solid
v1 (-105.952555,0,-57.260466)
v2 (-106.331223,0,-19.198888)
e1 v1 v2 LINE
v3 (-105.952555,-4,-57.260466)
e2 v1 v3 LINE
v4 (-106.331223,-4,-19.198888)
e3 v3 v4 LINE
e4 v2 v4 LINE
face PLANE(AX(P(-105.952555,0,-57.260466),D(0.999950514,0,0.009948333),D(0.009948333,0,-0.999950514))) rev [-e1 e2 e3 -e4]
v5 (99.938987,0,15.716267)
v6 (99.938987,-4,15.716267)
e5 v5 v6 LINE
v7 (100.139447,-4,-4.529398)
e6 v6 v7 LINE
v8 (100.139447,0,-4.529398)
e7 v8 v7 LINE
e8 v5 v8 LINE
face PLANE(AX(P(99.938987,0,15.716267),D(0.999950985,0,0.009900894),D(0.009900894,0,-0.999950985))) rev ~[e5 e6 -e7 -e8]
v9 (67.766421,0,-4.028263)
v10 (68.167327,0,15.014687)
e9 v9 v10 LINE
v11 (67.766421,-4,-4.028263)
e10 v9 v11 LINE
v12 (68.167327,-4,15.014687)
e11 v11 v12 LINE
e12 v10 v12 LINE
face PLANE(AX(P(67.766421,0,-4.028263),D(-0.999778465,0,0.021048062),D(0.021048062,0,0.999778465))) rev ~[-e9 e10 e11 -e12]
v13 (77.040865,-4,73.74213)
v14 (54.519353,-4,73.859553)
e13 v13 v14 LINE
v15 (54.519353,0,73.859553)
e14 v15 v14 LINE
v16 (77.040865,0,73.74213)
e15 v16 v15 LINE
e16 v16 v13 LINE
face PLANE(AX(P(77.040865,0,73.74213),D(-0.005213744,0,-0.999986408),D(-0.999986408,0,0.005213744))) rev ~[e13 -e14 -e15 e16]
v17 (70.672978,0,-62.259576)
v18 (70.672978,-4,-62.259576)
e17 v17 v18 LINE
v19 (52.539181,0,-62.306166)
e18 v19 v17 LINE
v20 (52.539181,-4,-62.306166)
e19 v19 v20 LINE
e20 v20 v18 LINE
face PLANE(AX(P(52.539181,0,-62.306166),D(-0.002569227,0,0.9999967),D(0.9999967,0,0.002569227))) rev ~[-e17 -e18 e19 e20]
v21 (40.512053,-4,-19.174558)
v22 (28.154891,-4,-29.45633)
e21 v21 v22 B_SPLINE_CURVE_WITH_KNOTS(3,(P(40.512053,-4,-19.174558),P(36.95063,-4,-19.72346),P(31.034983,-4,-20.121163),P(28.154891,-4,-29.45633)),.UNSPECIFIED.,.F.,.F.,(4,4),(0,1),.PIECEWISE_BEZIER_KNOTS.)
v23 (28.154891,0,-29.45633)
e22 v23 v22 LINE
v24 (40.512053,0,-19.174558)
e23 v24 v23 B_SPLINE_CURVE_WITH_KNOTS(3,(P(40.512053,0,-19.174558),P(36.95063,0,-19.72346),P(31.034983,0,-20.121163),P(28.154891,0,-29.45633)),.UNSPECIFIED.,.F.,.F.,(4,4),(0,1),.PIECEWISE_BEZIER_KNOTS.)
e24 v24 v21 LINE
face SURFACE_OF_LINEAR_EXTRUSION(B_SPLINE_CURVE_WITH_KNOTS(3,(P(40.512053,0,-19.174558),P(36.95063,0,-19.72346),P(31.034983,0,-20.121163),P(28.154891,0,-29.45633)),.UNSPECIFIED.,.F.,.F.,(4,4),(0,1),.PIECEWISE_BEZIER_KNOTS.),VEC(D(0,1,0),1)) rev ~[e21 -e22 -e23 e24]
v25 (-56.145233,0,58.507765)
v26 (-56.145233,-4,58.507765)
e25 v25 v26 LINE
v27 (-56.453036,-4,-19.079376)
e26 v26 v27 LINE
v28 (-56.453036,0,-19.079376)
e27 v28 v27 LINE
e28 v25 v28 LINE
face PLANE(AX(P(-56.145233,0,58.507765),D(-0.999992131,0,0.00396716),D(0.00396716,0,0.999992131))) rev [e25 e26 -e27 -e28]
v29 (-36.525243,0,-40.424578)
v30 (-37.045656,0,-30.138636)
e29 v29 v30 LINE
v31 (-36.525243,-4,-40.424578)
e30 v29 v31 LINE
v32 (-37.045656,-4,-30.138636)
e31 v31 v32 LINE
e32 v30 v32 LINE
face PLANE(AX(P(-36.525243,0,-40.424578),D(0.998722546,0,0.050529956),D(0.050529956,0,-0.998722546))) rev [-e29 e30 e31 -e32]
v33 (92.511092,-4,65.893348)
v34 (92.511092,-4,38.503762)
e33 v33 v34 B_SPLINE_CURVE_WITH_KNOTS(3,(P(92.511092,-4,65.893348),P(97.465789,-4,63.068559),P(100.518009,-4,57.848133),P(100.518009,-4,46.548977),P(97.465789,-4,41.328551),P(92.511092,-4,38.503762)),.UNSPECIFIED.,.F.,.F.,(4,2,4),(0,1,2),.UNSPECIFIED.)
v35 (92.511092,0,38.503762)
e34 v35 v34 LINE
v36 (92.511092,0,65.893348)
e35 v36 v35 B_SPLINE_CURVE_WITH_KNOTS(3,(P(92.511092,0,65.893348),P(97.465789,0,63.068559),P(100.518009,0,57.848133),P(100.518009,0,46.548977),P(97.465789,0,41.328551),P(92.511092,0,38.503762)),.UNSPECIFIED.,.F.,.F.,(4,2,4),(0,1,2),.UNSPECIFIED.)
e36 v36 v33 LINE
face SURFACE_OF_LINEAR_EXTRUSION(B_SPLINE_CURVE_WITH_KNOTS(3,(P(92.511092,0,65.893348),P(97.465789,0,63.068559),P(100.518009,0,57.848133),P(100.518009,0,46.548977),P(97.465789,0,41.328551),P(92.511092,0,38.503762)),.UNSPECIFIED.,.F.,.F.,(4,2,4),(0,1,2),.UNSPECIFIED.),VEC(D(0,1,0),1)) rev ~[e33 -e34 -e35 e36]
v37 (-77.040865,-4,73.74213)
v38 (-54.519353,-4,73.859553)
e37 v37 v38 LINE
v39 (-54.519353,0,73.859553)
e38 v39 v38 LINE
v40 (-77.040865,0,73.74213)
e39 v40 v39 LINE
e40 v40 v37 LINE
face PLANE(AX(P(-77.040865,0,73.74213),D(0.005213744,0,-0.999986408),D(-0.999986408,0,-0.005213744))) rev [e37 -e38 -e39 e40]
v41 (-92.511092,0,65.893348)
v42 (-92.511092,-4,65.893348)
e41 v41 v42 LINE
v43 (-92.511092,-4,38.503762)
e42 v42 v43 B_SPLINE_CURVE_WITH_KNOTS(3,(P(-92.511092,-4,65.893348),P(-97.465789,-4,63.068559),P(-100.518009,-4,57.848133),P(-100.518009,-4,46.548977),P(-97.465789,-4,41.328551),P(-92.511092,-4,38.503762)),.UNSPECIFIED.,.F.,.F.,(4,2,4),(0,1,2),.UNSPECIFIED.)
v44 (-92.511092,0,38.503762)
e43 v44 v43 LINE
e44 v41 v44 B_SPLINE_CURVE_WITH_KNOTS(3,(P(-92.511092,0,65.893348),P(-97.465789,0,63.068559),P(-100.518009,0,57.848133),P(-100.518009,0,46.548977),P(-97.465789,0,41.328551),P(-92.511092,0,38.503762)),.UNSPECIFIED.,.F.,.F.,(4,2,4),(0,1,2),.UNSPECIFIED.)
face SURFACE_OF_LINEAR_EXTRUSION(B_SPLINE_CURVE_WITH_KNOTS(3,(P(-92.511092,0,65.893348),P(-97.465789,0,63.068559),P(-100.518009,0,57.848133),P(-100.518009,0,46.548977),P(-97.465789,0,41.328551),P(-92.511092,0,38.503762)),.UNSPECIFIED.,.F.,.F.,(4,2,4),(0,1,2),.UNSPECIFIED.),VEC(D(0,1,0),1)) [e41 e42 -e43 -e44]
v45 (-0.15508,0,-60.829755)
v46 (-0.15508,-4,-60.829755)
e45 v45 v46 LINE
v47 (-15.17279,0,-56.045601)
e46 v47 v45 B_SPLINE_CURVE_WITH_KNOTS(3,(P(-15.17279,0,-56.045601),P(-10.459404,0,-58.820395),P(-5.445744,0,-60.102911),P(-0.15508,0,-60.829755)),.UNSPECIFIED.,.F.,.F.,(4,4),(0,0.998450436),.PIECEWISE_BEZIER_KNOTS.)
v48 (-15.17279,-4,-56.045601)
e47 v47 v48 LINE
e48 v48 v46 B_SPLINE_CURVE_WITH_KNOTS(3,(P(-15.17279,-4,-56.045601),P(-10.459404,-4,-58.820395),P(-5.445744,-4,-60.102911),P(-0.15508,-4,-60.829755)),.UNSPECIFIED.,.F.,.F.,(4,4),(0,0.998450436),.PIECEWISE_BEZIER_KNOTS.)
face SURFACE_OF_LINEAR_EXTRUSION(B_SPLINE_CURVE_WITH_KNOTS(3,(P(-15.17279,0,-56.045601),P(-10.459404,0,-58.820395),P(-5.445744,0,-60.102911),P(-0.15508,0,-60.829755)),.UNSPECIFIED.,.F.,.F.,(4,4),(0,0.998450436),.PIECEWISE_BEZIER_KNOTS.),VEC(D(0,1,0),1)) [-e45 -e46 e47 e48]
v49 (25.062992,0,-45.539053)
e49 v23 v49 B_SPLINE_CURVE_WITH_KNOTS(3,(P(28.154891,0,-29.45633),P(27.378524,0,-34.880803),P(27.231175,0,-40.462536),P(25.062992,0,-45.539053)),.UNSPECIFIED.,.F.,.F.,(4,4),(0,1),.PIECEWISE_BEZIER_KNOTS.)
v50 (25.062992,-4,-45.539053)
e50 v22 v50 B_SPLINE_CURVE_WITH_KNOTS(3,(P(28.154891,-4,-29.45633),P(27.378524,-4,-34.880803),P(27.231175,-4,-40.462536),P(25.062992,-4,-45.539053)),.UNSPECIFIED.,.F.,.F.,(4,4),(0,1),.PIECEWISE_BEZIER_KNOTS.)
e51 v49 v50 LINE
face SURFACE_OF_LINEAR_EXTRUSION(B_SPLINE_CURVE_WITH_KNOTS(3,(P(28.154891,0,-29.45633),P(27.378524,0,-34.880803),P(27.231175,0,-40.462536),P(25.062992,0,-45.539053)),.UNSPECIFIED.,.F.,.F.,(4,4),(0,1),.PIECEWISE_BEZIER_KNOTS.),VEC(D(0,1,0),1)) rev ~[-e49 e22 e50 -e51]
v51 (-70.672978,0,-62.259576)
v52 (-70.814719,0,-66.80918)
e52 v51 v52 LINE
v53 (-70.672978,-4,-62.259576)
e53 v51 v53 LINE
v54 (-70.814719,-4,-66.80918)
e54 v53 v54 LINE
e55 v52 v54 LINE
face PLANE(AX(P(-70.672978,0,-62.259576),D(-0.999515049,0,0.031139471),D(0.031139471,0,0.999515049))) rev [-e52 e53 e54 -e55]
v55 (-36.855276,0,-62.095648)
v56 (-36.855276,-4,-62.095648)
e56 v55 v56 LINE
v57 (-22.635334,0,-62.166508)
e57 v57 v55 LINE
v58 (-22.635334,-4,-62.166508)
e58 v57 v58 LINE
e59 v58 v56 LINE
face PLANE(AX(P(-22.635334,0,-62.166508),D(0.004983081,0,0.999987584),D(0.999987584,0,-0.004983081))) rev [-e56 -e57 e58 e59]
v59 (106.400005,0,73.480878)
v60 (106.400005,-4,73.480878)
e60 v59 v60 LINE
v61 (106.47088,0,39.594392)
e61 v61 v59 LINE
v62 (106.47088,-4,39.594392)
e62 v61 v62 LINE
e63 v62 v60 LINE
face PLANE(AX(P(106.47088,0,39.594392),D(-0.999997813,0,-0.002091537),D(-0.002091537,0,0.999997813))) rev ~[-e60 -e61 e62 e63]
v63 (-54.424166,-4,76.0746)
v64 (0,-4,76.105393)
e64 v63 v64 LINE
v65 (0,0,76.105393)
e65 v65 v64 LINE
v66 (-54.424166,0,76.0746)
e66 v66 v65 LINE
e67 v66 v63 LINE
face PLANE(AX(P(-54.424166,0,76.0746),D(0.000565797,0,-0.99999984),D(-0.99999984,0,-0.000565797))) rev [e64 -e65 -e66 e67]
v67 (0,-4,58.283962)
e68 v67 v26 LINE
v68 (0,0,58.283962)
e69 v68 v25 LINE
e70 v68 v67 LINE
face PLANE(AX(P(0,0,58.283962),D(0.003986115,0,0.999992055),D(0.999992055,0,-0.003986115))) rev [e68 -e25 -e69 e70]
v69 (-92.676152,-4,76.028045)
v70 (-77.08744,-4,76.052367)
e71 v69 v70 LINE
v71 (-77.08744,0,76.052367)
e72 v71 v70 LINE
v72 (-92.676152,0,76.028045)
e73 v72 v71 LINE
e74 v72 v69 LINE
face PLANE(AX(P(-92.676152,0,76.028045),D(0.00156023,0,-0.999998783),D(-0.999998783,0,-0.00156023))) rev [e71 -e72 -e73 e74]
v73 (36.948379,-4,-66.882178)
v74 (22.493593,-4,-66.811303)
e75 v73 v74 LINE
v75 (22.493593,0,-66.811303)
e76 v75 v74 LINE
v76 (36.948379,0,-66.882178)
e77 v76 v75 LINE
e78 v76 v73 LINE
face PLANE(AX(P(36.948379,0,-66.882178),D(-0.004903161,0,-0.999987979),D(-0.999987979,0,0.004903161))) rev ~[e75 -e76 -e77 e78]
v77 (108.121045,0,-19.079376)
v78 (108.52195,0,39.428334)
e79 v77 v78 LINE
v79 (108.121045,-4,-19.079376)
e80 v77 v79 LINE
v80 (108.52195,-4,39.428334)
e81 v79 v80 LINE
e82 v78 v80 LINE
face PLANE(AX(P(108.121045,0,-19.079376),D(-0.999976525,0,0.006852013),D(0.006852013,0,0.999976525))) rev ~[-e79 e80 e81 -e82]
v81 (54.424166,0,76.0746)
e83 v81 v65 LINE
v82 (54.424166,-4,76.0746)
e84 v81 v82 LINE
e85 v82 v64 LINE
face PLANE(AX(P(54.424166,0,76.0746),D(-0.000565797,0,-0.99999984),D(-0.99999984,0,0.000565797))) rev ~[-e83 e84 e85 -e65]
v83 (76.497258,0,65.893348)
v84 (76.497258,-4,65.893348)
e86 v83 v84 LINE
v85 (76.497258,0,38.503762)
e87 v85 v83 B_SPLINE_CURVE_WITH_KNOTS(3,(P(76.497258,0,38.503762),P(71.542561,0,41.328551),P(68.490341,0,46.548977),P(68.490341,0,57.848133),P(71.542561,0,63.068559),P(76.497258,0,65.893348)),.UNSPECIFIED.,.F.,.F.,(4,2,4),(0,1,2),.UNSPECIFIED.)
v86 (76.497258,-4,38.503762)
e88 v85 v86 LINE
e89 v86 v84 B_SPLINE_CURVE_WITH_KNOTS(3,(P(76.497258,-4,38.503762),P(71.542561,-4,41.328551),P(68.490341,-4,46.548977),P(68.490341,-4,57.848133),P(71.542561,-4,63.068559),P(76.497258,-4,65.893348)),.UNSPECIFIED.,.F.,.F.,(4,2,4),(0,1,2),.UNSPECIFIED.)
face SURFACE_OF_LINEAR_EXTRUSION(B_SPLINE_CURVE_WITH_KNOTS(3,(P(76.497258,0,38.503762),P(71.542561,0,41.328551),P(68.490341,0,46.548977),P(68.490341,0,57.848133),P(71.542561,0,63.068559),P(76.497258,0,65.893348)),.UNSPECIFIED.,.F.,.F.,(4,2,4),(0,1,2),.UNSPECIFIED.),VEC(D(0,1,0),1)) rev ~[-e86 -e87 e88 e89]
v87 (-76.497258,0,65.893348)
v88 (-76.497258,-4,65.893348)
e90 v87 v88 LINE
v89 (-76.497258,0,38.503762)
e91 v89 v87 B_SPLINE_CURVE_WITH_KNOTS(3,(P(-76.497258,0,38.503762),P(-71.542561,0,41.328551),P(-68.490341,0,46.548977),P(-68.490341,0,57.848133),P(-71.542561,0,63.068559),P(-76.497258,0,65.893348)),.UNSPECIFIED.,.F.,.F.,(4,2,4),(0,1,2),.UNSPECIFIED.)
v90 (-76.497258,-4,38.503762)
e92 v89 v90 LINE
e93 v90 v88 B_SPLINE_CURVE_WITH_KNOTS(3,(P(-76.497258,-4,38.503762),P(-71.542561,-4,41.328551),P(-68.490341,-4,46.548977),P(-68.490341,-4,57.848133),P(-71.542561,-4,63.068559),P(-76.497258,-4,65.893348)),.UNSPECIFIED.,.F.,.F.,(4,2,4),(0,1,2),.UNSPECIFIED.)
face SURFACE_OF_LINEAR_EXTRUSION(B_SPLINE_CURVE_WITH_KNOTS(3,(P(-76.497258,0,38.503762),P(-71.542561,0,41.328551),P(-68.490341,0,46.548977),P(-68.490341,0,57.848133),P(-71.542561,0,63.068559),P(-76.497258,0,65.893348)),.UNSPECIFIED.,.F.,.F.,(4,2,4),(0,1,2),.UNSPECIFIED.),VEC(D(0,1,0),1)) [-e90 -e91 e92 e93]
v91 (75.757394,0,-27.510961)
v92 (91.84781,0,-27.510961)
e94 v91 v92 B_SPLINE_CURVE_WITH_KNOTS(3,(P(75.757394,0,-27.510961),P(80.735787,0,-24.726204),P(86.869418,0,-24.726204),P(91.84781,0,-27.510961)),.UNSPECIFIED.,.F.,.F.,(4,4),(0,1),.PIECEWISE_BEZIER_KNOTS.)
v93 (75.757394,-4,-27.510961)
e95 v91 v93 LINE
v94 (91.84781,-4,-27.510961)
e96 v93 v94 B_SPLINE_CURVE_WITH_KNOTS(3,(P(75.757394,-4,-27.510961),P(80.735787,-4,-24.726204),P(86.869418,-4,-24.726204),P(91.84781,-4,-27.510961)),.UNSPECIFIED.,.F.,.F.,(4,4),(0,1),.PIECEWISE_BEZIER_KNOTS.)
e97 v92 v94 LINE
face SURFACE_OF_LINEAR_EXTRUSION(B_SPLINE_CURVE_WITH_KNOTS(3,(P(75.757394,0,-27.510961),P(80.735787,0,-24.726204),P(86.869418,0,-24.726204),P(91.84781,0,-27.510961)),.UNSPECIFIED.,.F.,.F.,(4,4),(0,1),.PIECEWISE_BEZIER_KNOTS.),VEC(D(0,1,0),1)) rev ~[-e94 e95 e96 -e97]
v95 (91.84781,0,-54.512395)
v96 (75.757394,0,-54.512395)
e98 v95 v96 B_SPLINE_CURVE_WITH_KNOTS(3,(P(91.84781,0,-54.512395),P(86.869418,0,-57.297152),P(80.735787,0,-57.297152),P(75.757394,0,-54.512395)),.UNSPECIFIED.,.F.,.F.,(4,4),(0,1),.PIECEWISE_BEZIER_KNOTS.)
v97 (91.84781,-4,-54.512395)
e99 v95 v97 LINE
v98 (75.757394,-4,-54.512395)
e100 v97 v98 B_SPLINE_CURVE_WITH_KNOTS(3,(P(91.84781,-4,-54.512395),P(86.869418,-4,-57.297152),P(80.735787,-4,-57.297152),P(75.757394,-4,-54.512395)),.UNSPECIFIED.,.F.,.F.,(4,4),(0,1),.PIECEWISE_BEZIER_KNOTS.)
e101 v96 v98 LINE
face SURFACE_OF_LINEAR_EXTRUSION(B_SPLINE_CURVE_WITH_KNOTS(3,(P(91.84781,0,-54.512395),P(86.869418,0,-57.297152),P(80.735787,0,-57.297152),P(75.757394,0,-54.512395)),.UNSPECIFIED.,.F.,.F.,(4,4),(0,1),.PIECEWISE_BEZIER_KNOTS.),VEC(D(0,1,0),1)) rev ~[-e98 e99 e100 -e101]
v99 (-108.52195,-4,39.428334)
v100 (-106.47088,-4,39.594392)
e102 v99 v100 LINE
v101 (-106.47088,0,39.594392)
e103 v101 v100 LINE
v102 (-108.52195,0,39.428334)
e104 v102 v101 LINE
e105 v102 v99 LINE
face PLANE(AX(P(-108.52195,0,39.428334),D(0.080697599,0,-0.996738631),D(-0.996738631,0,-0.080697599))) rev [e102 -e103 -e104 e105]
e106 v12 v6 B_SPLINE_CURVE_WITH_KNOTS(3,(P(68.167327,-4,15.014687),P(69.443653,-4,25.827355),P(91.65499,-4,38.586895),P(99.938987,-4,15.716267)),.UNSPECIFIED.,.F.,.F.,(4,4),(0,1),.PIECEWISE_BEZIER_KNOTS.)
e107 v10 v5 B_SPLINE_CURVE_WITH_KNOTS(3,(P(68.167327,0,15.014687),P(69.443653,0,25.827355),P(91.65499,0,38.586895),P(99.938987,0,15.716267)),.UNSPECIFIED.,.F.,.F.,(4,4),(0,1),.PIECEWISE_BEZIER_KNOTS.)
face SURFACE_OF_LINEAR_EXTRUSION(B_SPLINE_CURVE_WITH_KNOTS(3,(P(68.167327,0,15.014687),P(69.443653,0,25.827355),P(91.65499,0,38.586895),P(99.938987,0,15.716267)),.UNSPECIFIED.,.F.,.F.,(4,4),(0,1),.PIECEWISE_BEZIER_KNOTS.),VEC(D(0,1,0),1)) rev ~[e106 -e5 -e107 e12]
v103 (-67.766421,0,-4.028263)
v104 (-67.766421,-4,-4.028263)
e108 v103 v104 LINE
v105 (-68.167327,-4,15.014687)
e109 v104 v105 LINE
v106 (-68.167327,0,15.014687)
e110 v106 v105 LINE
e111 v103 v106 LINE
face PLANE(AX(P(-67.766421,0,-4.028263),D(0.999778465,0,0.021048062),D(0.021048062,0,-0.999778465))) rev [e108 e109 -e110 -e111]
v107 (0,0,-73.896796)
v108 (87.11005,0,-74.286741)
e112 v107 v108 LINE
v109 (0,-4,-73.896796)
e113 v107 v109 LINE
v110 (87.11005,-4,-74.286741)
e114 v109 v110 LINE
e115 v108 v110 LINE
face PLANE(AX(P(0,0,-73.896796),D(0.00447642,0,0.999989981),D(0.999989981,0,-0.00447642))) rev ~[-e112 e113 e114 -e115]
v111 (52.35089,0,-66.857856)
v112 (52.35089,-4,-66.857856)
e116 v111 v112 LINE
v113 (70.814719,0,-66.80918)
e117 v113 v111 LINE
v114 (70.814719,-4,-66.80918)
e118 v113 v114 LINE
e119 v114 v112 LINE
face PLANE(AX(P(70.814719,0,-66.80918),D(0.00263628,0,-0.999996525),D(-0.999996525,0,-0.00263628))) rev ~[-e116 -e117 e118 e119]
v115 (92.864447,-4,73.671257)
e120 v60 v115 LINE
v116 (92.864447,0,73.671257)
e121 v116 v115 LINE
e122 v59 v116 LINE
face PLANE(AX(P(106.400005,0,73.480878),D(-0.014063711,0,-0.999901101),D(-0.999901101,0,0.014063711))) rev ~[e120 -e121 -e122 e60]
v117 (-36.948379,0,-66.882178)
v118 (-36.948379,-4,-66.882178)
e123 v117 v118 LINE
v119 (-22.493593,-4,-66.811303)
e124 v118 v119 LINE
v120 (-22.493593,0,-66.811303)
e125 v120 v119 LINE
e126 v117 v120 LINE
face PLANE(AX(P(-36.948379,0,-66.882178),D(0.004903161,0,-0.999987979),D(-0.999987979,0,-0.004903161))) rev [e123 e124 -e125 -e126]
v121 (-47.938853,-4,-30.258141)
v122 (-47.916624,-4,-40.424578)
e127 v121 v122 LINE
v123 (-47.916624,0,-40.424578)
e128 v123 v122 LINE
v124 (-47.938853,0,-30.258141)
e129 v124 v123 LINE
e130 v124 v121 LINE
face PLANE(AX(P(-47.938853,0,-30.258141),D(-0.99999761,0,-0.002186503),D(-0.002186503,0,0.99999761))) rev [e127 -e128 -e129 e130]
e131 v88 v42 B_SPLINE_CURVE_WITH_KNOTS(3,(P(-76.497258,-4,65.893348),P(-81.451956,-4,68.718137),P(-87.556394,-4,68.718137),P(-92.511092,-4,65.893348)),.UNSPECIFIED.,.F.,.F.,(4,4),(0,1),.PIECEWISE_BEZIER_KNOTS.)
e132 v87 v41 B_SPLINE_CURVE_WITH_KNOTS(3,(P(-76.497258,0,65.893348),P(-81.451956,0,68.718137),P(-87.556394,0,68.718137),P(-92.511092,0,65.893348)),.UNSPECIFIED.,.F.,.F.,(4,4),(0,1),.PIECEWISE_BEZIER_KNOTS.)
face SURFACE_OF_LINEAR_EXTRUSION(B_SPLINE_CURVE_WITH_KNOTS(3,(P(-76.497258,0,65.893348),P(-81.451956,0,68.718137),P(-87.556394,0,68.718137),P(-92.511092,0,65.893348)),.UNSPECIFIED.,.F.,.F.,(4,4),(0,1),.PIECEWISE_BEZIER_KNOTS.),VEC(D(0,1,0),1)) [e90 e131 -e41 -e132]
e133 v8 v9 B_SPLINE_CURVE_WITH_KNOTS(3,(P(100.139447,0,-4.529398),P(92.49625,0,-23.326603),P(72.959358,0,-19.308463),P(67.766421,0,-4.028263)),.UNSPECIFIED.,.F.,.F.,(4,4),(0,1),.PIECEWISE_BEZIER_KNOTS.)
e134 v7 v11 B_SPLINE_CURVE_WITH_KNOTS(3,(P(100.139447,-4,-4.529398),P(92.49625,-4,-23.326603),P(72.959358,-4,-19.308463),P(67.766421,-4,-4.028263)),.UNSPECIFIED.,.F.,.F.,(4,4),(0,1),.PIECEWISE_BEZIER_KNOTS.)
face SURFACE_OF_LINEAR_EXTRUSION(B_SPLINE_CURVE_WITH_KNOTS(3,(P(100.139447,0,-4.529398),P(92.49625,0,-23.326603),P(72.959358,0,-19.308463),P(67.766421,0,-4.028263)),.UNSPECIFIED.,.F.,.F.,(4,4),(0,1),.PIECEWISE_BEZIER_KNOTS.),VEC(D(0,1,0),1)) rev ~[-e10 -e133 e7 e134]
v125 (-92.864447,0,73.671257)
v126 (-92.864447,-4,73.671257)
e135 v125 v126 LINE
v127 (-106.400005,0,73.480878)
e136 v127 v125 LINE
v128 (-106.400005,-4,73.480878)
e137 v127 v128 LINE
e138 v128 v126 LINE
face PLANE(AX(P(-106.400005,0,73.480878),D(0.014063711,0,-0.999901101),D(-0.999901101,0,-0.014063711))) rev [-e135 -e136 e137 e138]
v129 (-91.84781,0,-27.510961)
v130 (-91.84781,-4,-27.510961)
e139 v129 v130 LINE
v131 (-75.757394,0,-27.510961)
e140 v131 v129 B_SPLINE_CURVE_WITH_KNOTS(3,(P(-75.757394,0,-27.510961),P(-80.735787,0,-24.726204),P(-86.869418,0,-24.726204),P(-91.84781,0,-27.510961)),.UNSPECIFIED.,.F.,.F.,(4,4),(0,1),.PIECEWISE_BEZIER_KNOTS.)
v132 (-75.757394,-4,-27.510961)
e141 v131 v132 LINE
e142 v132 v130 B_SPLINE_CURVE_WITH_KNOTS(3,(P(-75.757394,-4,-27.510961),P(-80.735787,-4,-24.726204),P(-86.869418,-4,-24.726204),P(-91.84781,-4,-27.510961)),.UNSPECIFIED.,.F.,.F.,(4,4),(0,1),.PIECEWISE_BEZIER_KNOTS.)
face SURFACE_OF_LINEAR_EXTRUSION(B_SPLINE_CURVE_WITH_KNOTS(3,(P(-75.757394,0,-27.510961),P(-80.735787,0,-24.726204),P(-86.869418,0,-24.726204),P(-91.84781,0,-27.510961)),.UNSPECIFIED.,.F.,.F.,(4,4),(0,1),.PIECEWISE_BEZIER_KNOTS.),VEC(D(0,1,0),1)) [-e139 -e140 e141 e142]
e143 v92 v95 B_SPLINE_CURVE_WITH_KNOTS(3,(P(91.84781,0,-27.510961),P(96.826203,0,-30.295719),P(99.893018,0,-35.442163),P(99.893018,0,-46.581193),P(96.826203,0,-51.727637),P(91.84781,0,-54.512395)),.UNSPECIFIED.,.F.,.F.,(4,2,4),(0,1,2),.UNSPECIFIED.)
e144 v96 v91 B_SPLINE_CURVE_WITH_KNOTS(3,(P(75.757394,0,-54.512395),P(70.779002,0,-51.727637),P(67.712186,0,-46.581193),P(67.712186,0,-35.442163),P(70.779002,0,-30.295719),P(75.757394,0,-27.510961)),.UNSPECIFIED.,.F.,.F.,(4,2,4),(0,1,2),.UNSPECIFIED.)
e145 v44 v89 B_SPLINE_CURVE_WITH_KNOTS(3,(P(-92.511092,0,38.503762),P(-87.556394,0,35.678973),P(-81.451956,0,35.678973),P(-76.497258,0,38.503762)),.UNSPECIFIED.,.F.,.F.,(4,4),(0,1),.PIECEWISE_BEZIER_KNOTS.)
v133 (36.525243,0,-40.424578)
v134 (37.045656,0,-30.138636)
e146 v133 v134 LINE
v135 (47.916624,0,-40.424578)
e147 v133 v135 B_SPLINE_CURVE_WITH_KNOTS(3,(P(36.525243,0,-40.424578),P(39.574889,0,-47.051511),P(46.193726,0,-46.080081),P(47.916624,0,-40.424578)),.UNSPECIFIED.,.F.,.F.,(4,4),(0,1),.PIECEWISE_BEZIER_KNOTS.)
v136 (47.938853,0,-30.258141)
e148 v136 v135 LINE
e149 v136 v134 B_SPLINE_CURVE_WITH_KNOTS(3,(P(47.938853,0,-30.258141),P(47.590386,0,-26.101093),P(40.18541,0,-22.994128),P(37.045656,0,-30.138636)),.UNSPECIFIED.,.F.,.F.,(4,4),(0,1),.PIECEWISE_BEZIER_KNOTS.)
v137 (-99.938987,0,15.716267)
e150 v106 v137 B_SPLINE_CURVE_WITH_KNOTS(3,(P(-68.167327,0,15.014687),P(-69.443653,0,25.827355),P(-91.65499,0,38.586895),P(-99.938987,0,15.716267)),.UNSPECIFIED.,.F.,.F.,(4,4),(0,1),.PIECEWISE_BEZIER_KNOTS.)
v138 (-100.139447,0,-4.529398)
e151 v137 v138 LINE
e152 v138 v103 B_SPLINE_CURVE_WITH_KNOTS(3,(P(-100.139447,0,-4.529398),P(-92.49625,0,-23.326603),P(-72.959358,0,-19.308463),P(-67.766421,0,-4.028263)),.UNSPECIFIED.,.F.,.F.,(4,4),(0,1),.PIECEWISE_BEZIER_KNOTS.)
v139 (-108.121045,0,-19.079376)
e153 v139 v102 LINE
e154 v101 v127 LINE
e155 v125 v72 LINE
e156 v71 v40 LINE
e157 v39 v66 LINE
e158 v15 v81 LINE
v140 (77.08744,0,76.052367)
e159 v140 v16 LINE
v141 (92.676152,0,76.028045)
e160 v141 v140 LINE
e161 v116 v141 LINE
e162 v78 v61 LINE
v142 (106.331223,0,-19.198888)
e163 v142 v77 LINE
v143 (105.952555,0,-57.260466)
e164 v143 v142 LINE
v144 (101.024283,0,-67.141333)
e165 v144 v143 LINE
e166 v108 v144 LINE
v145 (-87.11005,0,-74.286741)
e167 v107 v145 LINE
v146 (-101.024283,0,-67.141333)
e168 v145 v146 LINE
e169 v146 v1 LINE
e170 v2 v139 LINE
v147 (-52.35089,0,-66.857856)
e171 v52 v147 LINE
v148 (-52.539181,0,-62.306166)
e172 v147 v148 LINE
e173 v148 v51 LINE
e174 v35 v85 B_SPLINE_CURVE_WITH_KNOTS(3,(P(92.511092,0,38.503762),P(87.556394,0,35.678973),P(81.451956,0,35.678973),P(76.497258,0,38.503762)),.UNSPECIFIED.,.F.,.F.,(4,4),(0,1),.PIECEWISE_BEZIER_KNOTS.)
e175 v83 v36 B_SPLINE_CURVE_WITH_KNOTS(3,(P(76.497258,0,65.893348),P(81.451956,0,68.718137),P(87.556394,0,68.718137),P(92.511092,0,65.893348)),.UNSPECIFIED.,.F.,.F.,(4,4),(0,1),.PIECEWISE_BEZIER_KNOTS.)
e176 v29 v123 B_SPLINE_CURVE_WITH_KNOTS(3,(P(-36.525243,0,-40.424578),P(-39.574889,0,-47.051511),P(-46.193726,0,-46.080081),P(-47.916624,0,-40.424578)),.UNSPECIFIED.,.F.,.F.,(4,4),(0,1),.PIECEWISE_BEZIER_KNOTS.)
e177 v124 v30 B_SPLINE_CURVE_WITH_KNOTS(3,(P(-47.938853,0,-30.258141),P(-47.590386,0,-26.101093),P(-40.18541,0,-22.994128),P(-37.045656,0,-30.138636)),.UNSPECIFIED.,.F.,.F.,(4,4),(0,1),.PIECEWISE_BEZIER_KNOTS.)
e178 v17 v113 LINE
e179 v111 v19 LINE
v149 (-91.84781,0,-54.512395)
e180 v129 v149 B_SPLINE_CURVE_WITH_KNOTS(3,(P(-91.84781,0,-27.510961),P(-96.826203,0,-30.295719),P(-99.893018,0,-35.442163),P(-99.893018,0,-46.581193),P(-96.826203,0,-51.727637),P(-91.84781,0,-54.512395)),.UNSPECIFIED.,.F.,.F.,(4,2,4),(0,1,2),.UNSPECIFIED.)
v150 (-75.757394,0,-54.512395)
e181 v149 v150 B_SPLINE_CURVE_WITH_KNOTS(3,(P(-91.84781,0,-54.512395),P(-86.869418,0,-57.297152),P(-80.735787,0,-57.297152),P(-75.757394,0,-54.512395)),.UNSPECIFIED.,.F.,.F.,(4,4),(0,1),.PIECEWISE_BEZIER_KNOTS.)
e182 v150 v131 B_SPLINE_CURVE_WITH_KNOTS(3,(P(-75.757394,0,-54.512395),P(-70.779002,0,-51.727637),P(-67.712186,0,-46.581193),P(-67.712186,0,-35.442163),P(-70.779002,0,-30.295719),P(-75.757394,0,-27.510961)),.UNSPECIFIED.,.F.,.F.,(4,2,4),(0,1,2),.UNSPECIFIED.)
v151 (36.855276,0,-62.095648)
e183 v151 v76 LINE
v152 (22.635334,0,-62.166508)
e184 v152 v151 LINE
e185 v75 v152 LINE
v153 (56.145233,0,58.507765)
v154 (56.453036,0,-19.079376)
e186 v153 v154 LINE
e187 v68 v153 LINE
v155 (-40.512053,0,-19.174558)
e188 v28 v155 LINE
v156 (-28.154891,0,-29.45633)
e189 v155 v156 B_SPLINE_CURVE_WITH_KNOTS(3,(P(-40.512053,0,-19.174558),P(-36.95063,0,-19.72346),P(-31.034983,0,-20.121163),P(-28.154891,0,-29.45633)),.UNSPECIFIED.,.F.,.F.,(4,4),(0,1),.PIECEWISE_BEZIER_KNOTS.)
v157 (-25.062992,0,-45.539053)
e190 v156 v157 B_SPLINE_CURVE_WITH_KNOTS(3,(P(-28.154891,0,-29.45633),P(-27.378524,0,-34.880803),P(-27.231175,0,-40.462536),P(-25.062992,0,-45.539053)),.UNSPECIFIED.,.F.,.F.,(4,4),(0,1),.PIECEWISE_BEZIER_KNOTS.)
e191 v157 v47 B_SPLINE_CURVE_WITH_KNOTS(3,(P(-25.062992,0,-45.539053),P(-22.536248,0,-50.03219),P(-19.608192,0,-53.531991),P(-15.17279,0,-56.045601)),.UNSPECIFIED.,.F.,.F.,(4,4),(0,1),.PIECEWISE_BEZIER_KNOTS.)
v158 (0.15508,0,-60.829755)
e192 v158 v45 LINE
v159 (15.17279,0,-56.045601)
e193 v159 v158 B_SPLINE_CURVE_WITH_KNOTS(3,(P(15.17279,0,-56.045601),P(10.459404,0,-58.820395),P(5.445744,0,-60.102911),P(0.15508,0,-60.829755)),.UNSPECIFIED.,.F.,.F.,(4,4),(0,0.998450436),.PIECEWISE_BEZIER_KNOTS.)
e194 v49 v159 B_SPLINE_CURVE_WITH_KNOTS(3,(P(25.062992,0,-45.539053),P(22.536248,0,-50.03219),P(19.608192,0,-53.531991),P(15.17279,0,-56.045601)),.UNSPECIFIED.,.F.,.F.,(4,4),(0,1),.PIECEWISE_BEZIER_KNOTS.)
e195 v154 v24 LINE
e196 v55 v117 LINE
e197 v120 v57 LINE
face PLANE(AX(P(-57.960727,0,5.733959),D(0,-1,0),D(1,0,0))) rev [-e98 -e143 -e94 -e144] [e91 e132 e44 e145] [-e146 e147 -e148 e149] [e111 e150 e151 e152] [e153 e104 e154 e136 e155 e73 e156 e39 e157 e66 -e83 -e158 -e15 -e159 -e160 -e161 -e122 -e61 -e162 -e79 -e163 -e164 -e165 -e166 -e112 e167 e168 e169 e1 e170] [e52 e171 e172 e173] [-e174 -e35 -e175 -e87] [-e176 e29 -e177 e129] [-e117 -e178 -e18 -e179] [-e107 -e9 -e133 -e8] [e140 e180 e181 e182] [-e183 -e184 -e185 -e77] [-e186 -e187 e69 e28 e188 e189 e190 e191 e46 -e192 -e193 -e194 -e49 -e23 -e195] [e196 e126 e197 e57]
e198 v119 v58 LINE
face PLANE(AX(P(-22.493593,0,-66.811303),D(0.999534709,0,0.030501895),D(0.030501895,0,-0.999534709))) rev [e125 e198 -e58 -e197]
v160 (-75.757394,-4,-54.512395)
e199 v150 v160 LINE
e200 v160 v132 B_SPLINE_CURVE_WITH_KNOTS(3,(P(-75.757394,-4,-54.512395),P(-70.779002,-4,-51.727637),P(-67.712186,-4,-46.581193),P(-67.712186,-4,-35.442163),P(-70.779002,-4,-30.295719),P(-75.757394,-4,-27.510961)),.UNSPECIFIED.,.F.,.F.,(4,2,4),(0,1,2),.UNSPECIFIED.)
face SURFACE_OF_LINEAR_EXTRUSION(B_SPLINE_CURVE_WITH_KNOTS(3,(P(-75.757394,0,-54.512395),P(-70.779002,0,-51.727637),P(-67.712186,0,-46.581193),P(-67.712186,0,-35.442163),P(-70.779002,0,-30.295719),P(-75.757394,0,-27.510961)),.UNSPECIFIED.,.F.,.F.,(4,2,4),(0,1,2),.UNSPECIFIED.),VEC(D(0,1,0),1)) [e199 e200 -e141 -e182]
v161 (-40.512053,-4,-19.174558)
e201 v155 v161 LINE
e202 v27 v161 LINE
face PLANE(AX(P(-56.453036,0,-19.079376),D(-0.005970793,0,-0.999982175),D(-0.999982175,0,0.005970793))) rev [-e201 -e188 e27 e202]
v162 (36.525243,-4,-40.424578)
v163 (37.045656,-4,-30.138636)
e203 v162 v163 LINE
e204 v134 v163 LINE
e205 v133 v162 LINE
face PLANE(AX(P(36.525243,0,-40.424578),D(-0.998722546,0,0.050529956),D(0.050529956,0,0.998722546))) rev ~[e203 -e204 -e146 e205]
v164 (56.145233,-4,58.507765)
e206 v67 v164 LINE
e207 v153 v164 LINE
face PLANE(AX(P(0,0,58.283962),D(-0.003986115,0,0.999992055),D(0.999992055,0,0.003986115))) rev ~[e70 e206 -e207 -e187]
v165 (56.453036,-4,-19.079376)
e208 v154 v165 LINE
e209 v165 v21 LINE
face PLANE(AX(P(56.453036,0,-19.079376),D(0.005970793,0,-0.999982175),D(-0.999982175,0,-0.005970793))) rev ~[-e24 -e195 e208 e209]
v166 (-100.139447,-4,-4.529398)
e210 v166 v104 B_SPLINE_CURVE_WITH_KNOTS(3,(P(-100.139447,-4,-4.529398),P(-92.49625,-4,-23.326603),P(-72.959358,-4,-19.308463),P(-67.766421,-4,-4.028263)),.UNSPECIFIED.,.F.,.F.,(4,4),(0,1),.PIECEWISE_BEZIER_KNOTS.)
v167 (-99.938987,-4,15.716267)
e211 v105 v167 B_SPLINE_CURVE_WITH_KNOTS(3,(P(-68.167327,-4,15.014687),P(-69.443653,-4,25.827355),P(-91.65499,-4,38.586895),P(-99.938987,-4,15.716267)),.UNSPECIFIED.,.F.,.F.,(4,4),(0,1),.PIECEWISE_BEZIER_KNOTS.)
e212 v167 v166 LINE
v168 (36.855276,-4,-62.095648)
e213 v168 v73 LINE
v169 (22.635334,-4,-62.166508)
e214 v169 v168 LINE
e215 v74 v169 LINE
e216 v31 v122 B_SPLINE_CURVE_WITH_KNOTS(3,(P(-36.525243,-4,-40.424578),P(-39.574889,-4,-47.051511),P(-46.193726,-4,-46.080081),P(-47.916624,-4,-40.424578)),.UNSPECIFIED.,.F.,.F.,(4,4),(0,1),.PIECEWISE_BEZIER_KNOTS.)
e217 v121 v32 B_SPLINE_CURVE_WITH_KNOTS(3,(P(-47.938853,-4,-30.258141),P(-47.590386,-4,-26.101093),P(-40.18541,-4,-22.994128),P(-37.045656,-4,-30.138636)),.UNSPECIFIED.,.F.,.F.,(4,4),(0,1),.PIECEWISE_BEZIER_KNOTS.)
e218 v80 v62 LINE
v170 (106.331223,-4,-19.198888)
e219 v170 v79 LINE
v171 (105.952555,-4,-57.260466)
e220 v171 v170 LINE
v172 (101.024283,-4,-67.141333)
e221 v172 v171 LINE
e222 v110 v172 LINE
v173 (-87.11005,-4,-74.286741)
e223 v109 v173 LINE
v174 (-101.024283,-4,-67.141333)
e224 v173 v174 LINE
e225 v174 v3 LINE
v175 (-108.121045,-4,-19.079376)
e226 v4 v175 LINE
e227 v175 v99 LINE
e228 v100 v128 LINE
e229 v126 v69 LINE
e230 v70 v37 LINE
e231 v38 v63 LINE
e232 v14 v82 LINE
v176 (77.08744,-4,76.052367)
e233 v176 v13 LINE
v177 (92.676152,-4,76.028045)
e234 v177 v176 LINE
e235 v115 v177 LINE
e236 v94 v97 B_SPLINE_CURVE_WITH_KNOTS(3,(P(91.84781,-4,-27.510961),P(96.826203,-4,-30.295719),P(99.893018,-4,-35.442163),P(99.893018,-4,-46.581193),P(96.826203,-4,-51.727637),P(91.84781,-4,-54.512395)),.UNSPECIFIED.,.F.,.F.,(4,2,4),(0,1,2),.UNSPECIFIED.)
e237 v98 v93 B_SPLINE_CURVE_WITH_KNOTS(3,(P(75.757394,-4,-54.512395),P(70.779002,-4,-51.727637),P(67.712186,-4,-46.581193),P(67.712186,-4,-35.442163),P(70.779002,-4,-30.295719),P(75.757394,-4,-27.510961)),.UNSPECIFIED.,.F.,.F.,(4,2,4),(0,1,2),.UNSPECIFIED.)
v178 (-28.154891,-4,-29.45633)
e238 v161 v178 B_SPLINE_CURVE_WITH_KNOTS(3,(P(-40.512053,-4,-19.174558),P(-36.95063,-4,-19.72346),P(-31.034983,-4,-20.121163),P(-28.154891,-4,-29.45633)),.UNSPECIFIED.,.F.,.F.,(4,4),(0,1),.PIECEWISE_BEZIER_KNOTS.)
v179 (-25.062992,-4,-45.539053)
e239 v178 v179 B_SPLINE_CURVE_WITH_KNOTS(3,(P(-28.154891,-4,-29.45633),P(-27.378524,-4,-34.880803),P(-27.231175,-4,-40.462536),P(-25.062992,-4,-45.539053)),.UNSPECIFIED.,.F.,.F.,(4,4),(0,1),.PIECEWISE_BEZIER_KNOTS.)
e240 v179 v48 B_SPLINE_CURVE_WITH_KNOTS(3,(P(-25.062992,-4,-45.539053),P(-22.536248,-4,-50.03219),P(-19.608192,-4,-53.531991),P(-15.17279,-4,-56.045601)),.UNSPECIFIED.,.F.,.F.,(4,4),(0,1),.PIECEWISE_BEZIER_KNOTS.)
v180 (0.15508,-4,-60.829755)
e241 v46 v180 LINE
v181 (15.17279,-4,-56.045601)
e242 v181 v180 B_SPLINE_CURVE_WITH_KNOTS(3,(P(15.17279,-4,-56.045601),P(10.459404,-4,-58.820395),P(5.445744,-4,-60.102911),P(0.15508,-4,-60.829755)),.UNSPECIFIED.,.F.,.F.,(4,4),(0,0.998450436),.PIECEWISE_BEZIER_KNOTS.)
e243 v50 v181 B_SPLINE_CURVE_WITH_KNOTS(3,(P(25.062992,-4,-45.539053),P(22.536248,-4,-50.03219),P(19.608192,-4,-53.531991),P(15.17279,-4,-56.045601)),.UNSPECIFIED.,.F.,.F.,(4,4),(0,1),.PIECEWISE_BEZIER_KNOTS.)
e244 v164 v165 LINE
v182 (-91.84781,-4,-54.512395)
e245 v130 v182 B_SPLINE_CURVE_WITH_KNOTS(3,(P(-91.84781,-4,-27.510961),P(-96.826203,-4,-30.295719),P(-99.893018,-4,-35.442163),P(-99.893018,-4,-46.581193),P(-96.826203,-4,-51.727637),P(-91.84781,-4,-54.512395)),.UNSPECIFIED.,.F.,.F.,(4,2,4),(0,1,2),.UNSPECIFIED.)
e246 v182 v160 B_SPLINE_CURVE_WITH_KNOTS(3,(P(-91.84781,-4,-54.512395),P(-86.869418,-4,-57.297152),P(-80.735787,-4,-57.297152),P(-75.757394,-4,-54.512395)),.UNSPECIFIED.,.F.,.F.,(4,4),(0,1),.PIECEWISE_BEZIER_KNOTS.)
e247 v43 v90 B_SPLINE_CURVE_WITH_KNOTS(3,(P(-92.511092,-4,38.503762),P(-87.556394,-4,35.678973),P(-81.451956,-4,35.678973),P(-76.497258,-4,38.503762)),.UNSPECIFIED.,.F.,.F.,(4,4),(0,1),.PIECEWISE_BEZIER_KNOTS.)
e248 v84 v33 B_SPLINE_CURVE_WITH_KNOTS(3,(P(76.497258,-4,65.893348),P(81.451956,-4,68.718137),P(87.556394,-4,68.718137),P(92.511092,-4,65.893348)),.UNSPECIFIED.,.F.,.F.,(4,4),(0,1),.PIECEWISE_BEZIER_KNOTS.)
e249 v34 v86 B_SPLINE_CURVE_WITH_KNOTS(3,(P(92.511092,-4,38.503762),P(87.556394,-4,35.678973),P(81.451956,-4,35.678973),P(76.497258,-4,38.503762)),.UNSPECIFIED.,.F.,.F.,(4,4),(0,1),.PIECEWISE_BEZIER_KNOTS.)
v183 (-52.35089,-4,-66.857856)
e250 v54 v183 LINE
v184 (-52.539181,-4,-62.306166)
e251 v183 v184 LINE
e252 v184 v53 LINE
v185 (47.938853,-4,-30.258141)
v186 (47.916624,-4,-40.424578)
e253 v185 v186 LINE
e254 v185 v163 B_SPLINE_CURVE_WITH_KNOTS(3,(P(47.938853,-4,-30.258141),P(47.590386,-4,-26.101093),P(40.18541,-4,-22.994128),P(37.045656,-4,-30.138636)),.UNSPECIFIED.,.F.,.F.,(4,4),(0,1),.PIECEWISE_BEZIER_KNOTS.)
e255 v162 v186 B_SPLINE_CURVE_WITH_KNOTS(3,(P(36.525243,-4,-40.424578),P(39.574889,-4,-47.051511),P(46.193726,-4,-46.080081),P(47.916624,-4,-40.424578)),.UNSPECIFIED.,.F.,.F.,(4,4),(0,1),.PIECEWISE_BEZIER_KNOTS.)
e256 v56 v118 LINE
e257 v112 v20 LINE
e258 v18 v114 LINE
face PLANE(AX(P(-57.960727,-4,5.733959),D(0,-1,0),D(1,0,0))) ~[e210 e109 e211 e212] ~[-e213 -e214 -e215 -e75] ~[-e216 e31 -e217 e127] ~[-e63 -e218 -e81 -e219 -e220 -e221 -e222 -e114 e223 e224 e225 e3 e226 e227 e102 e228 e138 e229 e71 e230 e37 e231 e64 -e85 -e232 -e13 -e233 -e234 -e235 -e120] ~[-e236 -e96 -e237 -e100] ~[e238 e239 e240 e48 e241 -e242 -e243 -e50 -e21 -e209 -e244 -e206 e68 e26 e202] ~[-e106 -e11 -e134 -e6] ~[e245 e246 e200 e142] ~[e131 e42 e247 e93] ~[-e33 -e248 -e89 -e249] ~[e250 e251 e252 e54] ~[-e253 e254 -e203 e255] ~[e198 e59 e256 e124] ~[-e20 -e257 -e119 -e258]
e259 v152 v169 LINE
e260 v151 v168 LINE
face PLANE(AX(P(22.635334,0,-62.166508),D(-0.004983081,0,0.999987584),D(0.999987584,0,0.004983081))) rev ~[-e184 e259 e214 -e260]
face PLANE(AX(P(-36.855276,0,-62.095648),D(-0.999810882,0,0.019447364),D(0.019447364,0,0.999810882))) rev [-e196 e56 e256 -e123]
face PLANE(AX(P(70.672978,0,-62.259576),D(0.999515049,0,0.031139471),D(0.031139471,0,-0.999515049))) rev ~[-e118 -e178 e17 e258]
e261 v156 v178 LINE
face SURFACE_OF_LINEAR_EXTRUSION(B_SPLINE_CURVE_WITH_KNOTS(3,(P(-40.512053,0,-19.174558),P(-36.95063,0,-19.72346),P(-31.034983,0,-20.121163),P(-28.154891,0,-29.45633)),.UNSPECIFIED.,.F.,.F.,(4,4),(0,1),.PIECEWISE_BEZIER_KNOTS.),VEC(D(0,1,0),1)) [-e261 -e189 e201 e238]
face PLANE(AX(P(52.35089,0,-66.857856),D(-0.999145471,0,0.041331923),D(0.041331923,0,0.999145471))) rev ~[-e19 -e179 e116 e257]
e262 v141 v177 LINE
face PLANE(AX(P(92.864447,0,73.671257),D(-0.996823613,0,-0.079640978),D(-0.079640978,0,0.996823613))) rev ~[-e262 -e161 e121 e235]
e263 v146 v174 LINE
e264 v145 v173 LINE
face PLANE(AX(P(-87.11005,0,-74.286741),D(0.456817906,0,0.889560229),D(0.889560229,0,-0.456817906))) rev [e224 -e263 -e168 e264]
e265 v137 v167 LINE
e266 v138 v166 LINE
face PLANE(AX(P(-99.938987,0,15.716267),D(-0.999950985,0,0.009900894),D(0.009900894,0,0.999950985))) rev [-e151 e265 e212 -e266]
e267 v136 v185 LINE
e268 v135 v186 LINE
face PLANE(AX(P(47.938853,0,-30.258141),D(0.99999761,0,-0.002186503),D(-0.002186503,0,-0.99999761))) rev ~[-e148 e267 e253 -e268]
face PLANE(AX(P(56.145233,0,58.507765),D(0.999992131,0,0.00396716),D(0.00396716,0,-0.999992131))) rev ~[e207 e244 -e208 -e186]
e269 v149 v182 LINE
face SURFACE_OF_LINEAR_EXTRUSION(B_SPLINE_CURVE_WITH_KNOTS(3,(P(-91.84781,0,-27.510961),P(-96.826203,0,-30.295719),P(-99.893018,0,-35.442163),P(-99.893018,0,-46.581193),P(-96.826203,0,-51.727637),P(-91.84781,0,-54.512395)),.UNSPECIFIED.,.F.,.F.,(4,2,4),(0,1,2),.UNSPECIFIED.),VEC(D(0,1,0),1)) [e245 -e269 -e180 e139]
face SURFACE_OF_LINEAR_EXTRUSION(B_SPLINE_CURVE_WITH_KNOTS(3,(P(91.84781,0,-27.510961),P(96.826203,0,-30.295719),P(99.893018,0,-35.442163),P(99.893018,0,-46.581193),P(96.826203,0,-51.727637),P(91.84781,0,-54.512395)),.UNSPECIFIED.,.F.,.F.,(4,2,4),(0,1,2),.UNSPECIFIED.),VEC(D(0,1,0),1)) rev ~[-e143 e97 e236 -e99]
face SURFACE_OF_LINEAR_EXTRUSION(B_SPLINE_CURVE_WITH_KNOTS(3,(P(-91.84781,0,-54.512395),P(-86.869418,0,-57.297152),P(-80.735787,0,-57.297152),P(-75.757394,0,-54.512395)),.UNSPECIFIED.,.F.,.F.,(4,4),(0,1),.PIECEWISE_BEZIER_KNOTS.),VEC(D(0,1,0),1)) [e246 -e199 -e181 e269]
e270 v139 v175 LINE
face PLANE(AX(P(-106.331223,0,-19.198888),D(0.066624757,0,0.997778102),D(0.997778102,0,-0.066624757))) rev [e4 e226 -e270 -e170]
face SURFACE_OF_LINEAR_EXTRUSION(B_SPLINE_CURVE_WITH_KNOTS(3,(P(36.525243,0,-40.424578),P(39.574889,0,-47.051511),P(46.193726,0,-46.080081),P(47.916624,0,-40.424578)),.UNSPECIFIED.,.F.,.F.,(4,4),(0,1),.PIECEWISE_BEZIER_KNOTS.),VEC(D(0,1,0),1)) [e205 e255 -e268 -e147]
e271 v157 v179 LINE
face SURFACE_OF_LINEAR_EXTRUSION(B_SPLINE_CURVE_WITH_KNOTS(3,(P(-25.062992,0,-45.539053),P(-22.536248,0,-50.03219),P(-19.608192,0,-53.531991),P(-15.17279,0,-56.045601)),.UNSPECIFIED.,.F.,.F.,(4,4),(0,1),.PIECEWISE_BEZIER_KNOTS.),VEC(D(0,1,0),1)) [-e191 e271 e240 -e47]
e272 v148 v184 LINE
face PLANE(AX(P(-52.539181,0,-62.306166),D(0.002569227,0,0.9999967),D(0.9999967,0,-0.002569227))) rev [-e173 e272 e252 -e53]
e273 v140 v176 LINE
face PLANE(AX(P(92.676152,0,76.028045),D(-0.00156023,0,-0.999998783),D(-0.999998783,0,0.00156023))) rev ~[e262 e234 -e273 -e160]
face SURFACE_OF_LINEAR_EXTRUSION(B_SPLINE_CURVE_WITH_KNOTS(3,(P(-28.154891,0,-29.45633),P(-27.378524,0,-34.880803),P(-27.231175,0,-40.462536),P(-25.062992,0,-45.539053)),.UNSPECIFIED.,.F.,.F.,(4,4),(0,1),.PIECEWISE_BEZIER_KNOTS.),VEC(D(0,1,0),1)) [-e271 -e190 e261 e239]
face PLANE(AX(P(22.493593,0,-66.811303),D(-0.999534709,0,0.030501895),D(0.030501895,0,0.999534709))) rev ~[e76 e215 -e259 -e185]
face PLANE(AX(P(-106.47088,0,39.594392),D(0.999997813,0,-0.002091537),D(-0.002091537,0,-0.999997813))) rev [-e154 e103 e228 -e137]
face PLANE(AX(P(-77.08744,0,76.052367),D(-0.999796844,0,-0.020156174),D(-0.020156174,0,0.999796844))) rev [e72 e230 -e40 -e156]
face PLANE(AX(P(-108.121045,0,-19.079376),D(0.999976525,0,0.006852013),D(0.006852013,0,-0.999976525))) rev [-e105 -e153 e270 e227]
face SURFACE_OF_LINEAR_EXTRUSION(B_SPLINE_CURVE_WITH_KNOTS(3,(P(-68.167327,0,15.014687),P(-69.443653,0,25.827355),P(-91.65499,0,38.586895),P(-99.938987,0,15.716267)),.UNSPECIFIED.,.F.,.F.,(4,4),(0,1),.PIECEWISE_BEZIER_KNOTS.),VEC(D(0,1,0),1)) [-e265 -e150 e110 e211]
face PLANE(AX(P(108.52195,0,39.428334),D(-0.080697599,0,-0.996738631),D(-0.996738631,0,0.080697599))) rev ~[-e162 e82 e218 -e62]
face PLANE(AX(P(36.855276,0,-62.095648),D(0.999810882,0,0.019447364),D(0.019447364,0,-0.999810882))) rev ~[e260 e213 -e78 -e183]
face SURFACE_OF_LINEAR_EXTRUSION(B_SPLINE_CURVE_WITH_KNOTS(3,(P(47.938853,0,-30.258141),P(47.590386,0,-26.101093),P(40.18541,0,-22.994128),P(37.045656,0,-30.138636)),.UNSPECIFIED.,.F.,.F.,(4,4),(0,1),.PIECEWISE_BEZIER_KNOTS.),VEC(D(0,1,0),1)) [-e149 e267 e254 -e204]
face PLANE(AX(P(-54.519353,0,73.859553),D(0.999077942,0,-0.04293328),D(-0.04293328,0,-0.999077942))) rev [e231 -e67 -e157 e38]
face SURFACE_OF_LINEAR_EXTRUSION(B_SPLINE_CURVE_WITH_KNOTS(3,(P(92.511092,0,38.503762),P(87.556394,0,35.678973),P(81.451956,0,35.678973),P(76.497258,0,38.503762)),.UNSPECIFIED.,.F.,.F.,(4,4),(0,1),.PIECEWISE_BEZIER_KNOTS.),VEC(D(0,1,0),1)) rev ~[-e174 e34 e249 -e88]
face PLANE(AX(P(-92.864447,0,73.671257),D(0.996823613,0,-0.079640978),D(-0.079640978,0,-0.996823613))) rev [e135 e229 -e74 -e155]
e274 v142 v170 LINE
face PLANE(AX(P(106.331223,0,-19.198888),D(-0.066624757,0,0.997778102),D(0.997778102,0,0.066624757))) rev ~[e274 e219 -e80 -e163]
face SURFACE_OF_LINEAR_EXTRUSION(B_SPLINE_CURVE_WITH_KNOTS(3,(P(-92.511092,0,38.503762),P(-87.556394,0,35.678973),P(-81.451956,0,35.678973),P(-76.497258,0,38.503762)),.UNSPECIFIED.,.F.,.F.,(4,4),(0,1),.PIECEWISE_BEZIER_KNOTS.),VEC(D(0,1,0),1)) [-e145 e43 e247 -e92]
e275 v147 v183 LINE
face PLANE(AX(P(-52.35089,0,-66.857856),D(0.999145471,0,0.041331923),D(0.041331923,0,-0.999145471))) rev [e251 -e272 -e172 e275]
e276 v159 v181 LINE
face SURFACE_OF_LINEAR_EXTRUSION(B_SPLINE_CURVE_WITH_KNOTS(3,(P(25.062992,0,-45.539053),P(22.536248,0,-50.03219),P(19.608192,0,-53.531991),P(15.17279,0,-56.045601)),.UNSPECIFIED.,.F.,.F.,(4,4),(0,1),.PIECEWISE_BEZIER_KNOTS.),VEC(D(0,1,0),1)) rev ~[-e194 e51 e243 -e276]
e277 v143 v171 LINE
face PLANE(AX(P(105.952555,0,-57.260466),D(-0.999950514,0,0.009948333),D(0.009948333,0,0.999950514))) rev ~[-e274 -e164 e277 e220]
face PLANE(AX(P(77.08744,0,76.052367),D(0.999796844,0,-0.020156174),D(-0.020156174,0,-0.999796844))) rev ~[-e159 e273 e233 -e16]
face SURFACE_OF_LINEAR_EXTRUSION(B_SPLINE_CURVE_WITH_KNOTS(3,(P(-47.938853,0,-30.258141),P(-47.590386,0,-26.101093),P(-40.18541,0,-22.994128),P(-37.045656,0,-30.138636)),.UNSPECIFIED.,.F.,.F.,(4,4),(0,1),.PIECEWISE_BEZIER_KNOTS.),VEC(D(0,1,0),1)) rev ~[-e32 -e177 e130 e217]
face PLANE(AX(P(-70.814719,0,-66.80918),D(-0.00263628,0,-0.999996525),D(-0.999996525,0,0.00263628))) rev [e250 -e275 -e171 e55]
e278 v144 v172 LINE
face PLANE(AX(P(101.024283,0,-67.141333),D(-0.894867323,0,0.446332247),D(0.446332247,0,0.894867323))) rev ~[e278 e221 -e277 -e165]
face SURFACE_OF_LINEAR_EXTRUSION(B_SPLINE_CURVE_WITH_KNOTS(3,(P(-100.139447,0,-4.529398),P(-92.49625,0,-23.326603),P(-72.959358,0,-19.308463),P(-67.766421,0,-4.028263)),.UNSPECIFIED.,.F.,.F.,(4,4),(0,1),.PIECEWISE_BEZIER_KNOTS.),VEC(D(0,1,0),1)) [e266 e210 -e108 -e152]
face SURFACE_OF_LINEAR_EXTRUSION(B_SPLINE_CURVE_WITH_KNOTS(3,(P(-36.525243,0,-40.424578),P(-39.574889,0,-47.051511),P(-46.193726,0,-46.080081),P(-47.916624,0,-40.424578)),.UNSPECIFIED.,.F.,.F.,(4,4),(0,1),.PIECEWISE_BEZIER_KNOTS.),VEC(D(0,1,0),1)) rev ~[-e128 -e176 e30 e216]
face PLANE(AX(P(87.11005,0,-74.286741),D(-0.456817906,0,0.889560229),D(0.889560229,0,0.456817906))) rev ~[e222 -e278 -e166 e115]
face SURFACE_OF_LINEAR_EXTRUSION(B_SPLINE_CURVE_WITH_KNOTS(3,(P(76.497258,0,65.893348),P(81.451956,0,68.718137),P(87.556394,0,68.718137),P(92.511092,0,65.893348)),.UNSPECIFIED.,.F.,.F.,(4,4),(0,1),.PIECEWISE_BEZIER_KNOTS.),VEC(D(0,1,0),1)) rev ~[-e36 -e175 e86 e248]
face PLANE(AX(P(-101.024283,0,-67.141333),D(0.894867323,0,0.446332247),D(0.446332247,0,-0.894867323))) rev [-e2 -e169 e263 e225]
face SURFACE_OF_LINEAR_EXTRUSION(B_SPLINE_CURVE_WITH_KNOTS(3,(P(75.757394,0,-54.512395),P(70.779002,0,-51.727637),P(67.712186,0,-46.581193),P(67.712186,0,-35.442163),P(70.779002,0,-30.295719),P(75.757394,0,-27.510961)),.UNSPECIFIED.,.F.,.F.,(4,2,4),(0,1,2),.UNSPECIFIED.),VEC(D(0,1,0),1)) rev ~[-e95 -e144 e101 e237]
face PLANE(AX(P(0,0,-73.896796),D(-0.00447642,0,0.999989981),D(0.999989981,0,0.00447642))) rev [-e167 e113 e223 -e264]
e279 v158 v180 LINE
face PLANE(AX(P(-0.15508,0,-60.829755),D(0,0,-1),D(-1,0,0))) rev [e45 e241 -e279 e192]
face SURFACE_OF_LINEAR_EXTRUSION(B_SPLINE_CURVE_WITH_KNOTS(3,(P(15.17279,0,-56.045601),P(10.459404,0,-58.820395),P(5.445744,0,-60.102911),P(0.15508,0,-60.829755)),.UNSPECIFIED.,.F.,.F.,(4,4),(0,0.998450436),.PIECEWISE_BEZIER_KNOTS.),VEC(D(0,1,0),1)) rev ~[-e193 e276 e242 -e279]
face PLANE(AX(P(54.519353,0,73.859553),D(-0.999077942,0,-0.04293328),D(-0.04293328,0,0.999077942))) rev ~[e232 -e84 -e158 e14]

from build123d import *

# Parameters (mm, degrees)
F1_DEPTH = 4


# Not quite as in the source:
# - ends of sketch curves that miss each other by under 0.0002 mm in the source are joined


with BuildPart() as f1:
    # F0 (on Front) → F1 (new body)
    with BuildSketch(Plane.XZ):
        with BuildLine():
            Line((0, -60.8297549188), (0, -73.8967955112))
            Line((0, -73.8967955112), (87.1100496289, -74.2867405805))
            Line((87.1100496289, -74.2867405805), (101.0242826289, -67.1413325805))
            Line((101.0242826289, -67.1413325805), (105.9525546289, -57.2604655805))
            Line((105.9525546289, -57.2604655805), (106.3312226289, -19.1988875805))
            Line((106.3312226289, -19.1988875805), (108.1210446289, -19.0793755805))
            Line((108.1210446289, -19.0793755805), (108.5219496289, 39.4283344195))
            Line((108.5219496289, 39.4283344195), (106.4708796289, 39.5943924195))
            Line((106.4708796289, 39.5943924195), (106.4000046289, 73.4808784195))
            Line((106.4000046289, 73.4808784195), (92.8644466289, 73.6712574195))
            Line((92.8644466289, 73.6712574195), (92.6761516289, 76.0280454195))
            Line((92.6761516289, 76.0280454195), (77.0874396289, 76.0523674195))
            Line((77.0874396289, 76.0523674195), (77.0408646289, 73.7421304195))
            Line((77.0408646289, 73.7421304195), (54.5193526289, 73.8595534195))
            Line((54.5193526289, 73.8595534195), (54.4241656289, 76.0746004195))
            Line((54.4241656289, 76.0746004195), (0, 76.1053934693))
            Line((0, 76.1053934693), (0, 58.2839623094))
            Line((0, 58.2839623094), (56.1452326289, 58.5077654195))
            Line((56.1452326289, 58.5077654195), (56.4530356289, -19.0793755805))
            Line((56.4530356289, -19.0793755805), (40.5120526289, -19.1745575805))
            add(Edge.make_bspline(
                [(40.5120526289, -19.1745575805), (36.9506296289, -19.7234595805), (31.0349826289, -20.1211625805), (28.1548906289, -29.4563295805)],
                knots=[0, 0, 0, 0, 1, 1, 1, 1], degree=3))
            add(Edge.make_bspline(
                [(28.1548906289, -29.4563295805), (27.3785236289, -34.8808025805), (27.2311746289, -40.4625355805), (25.0629916289, -45.5390525805)],
                knots=[0, 0, 0, 0, 1, 1, 1, 1], degree=3))
            add(Edge.make_bspline(
                [(25.0629916289, -45.5390525805), (22.5362476289, -50.0321895805), (19.6081916289, -53.5319905805), (15.1727896289, -56.0456005805)],
                knots=[0, 0, 0, 0, 1, 1, 1, 1], degree=3))
            add(Edge.make_bspline(
                [(15.1727896289, -56.0456005805), (10.4594036477, -58.820394717), (5.445743624, -60.1029114405), (0.1550796733, -60.8297549188)],
                knots=[0, 0, 0, 0, 0.9984504356, 0.9984504356, 0.9984504356, 0.9984504356], degree=3))
            Line((0.1550796733, -60.8297549188), (0, -60.8297549188))
        make_face()
        Polygon((22.4935926289, -66.8113025805), (22.6353336289, -62.1665075805), (36.8552756289, -62.0956475805), (36.9483786289, -66.8821775805), align=None, mode=Mode.SUBTRACT)
        with BuildLine():
            Line((36.5252426289, -40.4245775805), (37.0456556289, -30.1386355805))
            add(Edge.make_bspline(
                [(47.9388526289, -30.2581405805), (47.5903856289, -26.1010925805), (40.1854096289, -22.9941275805), (37.0456556289, -30.1386355805)],
                knots=[0, 0, 0, 0, 1, 1, 1, 1], degree=3))
            Line((47.9388526289, -30.2581405805), (47.9166236289, -40.4245775805))
            add(Edge.make_bspline(
                [(36.5252426289, -40.4245775805), (39.5748886289, -47.0515105805), (46.1937256289, -46.0800805805), (47.9166236289, -40.4245775805)],
                knots=[0, 0, 0, 0, 1, 1, 1, 1], degree=3))
        make_face(mode=Mode.SUBTRACT)
        Polygon((52.3508896289, -66.8578555805), (52.5391806289, -62.3061655805), (70.6729776289, -62.2595755805), (70.8147186289, -66.8091795805), align=None, mode=Mode.SUBTRACT)
        with BuildLine():
            add(Edge.make_bspline(
                [(91.8478096289, -27.5109605805), (96.8262026289, -30.2957185805), (99.8930176289, -35.4421625805), (99.8930176289, -41.0116775805)],
                knots=[0, 0, 0, 0, 1, 1, 1, 1], degree=3))
            add(Edge.make_bspline(
                [(99.8930176289, -41.0116775805), (99.8930176289, -46.5811925805), (96.8262026289, -51.7276365805), (91.8478096289, -54.5123945805)],
                knots=[0, 0, 0, 0, 1, 1, 1, 1], degree=3))
            add(Edge.make_bspline(
                [(91.8478096289, -54.5123945805), (86.8694176289, -57.2971515805), (80.7357866289, -57.2971515805), (75.7573936289, -54.5123945805)],
                knots=[0, 0, 0, 0, 1, 1, 1, 1], degree=3))
            add(Edge.make_bspline(
                [(75.7573936289, -54.5123945805), (70.7790016289, -51.7276365805), (67.7121856289, -46.5811925805), (67.7121856289, -41.0116775805)],
                knots=[0, 0, 0, 0, 1, 1, 1, 1], degree=3))
            add(Edge.make_bspline(
                [(67.7121856289, -41.0116775805), (67.7121856289, -35.4421625805), (70.7790016289, -30.2957185805), (75.7573936289, -27.5109605805)],
                knots=[0, 0, 0, 0, 1, 1, 1, 1], degree=3))
            add(Edge.make_bspline(
                [(75.7573936289, -27.5109605805), (80.7357866289, -24.7262035805), (86.8694176289, -24.7262035805), (91.8478096289, -27.5109605805)],
                knots=[0, 0, 0, 0, 1, 1, 1, 1], degree=3))
        make_face(mode=Mode.SUBTRACT)
        with BuildLine():
            add(Edge.make_bspline(
                [(68.1673266289, 15.0146874195), (69.4436526289, 25.8273554195), (91.6549896289, 38.5868954195), (99.9389866289, 15.7162674195)],
                knots=[0, 0, 0, 0, 1, 1, 1, 1], degree=3))
            Line((99.9389866289, 15.7162674195), (100.1394466289, -4.5293975805))
            add(Edge.make_bspline(
                [(100.1394466289, -4.5293975805), (92.4962496289, -23.3266025805), (72.9593576289, -19.3084625805), (67.7664206289, -4.0282625805)],
                knots=[0, 0, 0, 0, 1, 1, 1, 1], degree=3))
            Line((67.7664206289, -4.0282625805), (68.1673266289, 15.0146874195))
        make_face(mode=Mode.SUBTRACT)
        with BuildLine():
            add(Edge.make_bspline(
                [(92.5110916289, 65.8933484195), (97.4657886289, 63.0685594195), (100.5180086289, 57.8481334195), (100.5180086289, 52.1985554195)],
                knots=[0, 0, 0, 0, 1, 1, 1, 1], degree=3))
            add(Edge.make_bspline(
                [(100.5180086289, 52.1985554195), (100.5180086289, 46.5489774195), (97.4657886289, 41.3285514195), (92.5110916289, 38.5037624195)],
                knots=[0, 0, 0, 0, 1, 1, 1, 1], degree=3))
            add(Edge.make_bspline(
                [(92.5110916289, 38.5037624195), (87.5563936289, 35.6789734195), (81.4519556289, 35.6789734195), (76.4972576289, 38.5037624195)],
                knots=[0, 0, 0, 0, 1, 1, 1, 1], degree=3))
            add(Edge.make_bspline(
                [(76.4972576289, 38.5037624195), (71.5425606289, 41.3285514195), (68.4903406289, 46.5489774195), (68.4903406289, 52.1985554195)],
                knots=[0, 0, 0, 0, 1, 1, 1, 1], degree=3))
            add(Edge.make_bspline(
                [(68.4903406289, 52.1985554195), (68.4903406289, 57.8481334195), (71.5425606289, 63.0685594195), (76.4972576289, 65.8933484195)],
                knots=[0, 0, 0, 0, 1, 1, 1, 1], degree=3))
            add(Edge.make_bspline(
                [(76.4972576289, 65.8933484195), (81.4519556289, 68.7181374195), (87.5563936289, 68.7181374195), (92.5110916289, 65.8933484195)],
                knots=[0, 0, 0, 0, 1, 1, 1, 1], degree=3))
        make_face(mode=Mode.SUBTRACT)
    extrude(amount=F1_DEPTH)

    # F2: F1 across plane


with BuildPart() as f1_1:
    add(f1.part)
    add(f1.part.mirror(Plane.YZ))


solid = f1_1.part
